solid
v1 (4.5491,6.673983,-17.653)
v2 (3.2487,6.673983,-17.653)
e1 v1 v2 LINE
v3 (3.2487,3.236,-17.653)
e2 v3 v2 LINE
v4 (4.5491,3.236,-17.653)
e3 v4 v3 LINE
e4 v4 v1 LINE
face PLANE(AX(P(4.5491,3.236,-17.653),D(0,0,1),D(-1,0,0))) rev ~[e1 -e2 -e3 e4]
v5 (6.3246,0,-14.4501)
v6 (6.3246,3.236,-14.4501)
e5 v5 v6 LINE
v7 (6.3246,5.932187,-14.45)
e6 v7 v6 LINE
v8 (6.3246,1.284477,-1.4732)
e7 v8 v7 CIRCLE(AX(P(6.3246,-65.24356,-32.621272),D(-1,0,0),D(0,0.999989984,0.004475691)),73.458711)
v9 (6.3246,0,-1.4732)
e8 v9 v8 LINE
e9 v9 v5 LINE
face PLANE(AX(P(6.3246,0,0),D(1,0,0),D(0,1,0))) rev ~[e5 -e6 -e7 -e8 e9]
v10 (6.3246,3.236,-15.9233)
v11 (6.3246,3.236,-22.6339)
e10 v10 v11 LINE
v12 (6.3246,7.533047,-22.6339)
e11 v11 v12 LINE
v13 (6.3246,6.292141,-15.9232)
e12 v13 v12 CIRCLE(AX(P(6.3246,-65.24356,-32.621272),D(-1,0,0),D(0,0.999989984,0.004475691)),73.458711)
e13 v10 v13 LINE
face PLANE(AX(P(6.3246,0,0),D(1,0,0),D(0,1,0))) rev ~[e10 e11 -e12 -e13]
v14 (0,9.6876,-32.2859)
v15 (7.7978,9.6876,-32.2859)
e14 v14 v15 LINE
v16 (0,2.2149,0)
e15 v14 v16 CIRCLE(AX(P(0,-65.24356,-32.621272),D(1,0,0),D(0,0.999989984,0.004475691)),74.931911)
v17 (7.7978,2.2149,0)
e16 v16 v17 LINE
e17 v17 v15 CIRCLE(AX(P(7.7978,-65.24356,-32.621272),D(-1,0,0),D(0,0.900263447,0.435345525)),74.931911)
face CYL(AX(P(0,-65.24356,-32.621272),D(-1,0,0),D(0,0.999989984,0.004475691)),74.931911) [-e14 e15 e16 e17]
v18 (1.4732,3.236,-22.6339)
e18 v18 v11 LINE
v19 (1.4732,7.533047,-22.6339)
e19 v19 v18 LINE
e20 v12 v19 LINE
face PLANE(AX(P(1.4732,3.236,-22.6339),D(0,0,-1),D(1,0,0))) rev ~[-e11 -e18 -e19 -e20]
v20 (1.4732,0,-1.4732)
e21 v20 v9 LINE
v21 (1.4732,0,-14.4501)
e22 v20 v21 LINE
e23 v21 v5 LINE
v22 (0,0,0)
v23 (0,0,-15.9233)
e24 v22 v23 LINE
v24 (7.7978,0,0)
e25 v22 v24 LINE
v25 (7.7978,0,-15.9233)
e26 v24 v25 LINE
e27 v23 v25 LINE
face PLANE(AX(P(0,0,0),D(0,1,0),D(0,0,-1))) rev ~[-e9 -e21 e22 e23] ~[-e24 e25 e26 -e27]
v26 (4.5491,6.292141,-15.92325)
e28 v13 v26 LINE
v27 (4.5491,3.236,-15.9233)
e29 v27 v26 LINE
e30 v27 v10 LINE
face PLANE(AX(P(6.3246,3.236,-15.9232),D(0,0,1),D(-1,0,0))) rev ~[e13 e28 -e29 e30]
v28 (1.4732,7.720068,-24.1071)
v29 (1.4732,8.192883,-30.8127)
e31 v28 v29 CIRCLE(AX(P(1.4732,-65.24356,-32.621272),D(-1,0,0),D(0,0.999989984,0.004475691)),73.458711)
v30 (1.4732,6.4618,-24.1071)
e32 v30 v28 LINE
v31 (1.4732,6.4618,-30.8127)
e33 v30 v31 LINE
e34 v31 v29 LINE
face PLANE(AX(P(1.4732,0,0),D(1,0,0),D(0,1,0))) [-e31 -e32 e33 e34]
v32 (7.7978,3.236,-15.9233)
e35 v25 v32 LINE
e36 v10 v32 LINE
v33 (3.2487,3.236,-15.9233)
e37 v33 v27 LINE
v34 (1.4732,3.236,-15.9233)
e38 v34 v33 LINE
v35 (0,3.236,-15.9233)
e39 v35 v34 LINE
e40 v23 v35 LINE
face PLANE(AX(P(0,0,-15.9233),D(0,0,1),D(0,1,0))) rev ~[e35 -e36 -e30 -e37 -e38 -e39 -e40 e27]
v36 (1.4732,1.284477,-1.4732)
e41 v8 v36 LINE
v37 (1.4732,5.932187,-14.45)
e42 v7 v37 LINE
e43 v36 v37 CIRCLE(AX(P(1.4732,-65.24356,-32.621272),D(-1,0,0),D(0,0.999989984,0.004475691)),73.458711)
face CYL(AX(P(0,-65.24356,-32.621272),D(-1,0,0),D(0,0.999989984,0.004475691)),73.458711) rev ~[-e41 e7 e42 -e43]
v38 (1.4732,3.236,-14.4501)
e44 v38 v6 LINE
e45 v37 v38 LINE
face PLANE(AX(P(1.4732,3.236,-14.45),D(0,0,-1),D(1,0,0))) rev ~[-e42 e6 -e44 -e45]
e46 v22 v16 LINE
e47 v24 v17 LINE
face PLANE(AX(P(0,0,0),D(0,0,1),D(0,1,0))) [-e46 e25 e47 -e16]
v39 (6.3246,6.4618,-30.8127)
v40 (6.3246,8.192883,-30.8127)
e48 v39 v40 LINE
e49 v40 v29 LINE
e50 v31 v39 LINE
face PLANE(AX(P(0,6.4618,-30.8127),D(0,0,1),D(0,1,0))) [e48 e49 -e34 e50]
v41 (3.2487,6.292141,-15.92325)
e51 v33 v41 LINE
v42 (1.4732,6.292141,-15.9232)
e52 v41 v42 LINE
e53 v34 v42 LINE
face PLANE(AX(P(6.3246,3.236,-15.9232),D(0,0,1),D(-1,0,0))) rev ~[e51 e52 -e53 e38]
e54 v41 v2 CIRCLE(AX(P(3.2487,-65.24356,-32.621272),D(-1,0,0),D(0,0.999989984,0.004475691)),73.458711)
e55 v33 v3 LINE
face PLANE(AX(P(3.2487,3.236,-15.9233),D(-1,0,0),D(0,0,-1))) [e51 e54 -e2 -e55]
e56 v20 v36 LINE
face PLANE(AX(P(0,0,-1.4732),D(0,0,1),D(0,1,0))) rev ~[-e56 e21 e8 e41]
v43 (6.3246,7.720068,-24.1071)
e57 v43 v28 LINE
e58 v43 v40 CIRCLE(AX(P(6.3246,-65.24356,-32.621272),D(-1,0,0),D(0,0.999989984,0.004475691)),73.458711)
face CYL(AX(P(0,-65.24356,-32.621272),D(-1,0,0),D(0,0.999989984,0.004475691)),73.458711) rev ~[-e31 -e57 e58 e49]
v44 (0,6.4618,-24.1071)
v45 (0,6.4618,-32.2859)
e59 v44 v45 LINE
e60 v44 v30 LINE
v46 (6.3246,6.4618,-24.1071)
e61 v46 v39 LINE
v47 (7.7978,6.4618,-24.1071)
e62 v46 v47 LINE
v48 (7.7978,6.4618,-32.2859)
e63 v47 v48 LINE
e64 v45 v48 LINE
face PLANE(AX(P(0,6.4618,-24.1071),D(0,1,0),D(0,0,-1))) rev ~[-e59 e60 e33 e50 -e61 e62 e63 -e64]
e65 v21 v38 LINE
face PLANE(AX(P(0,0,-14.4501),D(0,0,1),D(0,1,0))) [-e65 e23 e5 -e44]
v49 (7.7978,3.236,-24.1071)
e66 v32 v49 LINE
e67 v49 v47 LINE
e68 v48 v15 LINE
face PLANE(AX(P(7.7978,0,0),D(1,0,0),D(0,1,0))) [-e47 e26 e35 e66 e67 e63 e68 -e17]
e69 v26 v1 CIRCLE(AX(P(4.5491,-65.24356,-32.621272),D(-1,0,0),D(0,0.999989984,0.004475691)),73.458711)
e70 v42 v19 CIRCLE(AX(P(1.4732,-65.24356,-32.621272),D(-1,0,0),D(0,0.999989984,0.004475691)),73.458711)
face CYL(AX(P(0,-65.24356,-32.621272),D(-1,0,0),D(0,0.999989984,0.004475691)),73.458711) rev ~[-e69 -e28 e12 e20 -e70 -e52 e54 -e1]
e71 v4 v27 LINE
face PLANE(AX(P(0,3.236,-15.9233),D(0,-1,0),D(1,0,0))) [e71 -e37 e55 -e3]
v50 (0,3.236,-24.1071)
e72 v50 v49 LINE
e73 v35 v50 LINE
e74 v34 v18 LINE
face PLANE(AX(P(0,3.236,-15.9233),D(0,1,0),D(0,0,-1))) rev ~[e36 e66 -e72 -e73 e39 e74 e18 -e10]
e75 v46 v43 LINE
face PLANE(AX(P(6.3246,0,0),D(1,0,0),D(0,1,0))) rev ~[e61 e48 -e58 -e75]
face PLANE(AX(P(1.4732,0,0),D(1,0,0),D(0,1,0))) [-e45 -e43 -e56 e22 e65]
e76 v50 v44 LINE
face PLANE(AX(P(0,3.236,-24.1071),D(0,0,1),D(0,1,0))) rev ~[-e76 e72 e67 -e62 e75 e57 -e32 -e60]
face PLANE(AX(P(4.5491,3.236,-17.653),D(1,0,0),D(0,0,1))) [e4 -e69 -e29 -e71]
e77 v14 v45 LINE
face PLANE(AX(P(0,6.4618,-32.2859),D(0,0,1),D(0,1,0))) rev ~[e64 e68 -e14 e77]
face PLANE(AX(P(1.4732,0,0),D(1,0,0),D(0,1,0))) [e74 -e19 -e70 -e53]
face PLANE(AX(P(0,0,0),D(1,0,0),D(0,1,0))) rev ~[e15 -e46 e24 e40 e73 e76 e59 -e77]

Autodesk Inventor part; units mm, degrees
ref_plane "YZ Plane" through (0, 0, 0) normal (1, 0, 0) x (0, 1, 0)
ref_plane "XZ Plane" through (0, 0, 0) normal (0, 1, 0) x (-1, 0, 0)
ref_plane "XY Plane" through (0, 0, 0) normal (0, 0, 1) x (1, 0, 0)
sketch "Sketch1" plane through (0, 0, 0) normal (1, 0, 0) x (0, 1, 0)
  line L0 (0, 0) -> (0, -15.9233)
  line L1 (0, -15.9233) -> (3.236, -15.9233)
  line L2 (3.236, -15.9233) -> (3.236, -24.1071)
  line L3 (3.236, -24.1071) -> (6.4618, -24.1071)
  line L4 (6.4618, -24.1071) -> (6.4618, -32.2859)
  line L5 (6.4618, -32.2859) -> (9.6876, -32.2859)
  line L6 (0, 0) -> (2.2149, 0)
  line L7 (9.6876, -32.2859) -> (40.3351, -32.2859) construction
  arc A0 (9.6876, -32.2859) -> (2.2149, 0) centre (-65.2438, -32.6213) ccw
  dimension "d0" = 15.9233
  dimension "d1" = 3.236
  dimension "d2" = 3.2258
  dimension "d3" = 3.2258
  dimension "d4" = 24.1071
  dimension "d5" = 32.2859
  dimension "d6" = 2.2149
extrude "Extrusion1" add sketch "Sketch1" along normal blind 7.7978
shell "Shell1" thickness 1.4732 removed faces 3 at (2.5993, 0, -5.3078) at (2.5993, 3.236, -18.6512) at (2.5993, 6.4618, -26.8334)
sketch "Sketch5" plane through (0, 3.236, -24.1071) normal (0, -1, 0) x (1, 0, 0)
  line L0 (6.3246, 8.1839) -> (7.7978, 8.1839) projected
  line L1 (7.7978, 8.1839) -> (1.4732, 8.1839)
  line L2 (1.4732, 8.1839) -> (1.4732, 9.6571)
  line L3 (1.4732, 9.6571) -> (7.7978, 9.6571)
  line L4 (7.7978, 9.6571) -> (7.7978, 8.1839)
  line L5 (0, 8.1839) -> (1.4732, 8.1839) projected
  line L6 (1.4732, 9.6571) -> (0, 9.6571)
  line L7 (0, 9.6571) -> (0, 8.1839)
  line L8 (0, 8.1839) -> (1.4732, 8.1839)
  line L9 (1.4732, 8.1839) -> (1.4732, 9.6571)
  point P0 (0, 24.1071)
extrude "Extrusion2" add sketch "Sketch5" against normal up to surface
sketch "Sketch8" plane through (0, 3.236, -24.1071) normal (0, -1, 0) x (1, 0, 0)
  line L0 (1.4732, 1.4732) -> (6.3246, 1.4732) projected
  line L1 (6.3246, 1.4732) -> (1.4732, 1.4732)
  line L2 (1.4732, 1.4732) -> (1.4732, 0)
  line L3 (1.4732, 0) -> (6.3246, 0)
  line L4 (6.3246, 0) -> (6.3246, 1.4732)
  point P0 (0, 24.1071)
  point P1 (7.7978, 0)
  point P2 (0, 0)
extrude "Extrusion3" add sketch "Sketch8" against normal up to surface
sketch "Sketch9" plane through (0, 0, -15.9233) normal (0, -1, 0) x (1, 0, 0)
  line L0 (1.4732, -6.7107) -> (1.4732, 0) projected
  line L1 (6.3246, 1.4732) -> (1.4732, 1.4732) projected
  line L2 (1.4732, 1.4732) -> (1.4732, 14.4501) projected
  line L3 (1.4732, 14.4501) -> (6.3246, 14.4501) projected
  line L4 (6.3246, 14.4501) -> (6.3246, 1.4732) projected
  line L5 (0, 15.9233) -> (0, 0) projected
  line L6 (0, 0) -> (7.7978, 0) projected
  line L7 (7.7978, 15.9233) -> (7.7978, 0) projected
  line L8 (0, 15.9233) -> (7.7978, 15.9233) projected
  line L9 (0, -8.1839) -> (7.7978, -8.1839) projected
  line L10 (7.7978, 0) -> (7.7978, -8.1839) projected
  line L11 (6.3246, 0) -> (7.7978, 0) projected
  line L12 (6.3246, 0) -> (6.3246, -6.7107) projected
  line L13 (6.3246, -6.7107) -> (1.4732, -6.7107) projected
  line L14 (1.4732, -6.7107) -> (1.4732, 0) projected
  line L15 (0, 0) -> (1.4732, 0) projected
  line L16 (0, 0) -> (0, -8.1839) projected
  line L17 (1.4732, -14.8895) -> (1.4732, -8.1839) projected
  line L18 (0, -8.1839) -> (1.4732, -8.1839) projected
  line L19 (0, -8.1839) -> (0, -16.3627) projected
  line L20 (0, -16.3627) -> (7.7978, -16.3627) projected
  line L21 (7.7978, -8.1839) -> (7.7978, -16.3627) projected
  line L22 (6.3246, -8.1839) -> (7.7978, -8.1839) projected
  line L23 (6.3246, -8.1839) -> (6.3246, -14.8895) projected
  line L24 (6.3246, -14.8895) -> (1.4732, -14.8895) projected
  line L25 (6.3246, 0) -> (1.4732, 0) projected
  line L26 (6.3246, -6.7107) -> (1.4732, -6.7107) projected
  line L27 (4.5491, -1.7297) -> (3.2487, -1.7297)
  line L28 (3.2487, 0) -> (3.2487, -1.7297)
  line L29 (4.5491, -1.7297) -> (4.5491, 0)
  line L30 (4.5491, 0) -> (3.2487, 0)
extrude "Extrusion4" add sketch "Sketch9" against normal up to next from surface at -3.236 contours L6 L29 L27 L28
properties part number "3x1 curve" material "ABS Plastic"
